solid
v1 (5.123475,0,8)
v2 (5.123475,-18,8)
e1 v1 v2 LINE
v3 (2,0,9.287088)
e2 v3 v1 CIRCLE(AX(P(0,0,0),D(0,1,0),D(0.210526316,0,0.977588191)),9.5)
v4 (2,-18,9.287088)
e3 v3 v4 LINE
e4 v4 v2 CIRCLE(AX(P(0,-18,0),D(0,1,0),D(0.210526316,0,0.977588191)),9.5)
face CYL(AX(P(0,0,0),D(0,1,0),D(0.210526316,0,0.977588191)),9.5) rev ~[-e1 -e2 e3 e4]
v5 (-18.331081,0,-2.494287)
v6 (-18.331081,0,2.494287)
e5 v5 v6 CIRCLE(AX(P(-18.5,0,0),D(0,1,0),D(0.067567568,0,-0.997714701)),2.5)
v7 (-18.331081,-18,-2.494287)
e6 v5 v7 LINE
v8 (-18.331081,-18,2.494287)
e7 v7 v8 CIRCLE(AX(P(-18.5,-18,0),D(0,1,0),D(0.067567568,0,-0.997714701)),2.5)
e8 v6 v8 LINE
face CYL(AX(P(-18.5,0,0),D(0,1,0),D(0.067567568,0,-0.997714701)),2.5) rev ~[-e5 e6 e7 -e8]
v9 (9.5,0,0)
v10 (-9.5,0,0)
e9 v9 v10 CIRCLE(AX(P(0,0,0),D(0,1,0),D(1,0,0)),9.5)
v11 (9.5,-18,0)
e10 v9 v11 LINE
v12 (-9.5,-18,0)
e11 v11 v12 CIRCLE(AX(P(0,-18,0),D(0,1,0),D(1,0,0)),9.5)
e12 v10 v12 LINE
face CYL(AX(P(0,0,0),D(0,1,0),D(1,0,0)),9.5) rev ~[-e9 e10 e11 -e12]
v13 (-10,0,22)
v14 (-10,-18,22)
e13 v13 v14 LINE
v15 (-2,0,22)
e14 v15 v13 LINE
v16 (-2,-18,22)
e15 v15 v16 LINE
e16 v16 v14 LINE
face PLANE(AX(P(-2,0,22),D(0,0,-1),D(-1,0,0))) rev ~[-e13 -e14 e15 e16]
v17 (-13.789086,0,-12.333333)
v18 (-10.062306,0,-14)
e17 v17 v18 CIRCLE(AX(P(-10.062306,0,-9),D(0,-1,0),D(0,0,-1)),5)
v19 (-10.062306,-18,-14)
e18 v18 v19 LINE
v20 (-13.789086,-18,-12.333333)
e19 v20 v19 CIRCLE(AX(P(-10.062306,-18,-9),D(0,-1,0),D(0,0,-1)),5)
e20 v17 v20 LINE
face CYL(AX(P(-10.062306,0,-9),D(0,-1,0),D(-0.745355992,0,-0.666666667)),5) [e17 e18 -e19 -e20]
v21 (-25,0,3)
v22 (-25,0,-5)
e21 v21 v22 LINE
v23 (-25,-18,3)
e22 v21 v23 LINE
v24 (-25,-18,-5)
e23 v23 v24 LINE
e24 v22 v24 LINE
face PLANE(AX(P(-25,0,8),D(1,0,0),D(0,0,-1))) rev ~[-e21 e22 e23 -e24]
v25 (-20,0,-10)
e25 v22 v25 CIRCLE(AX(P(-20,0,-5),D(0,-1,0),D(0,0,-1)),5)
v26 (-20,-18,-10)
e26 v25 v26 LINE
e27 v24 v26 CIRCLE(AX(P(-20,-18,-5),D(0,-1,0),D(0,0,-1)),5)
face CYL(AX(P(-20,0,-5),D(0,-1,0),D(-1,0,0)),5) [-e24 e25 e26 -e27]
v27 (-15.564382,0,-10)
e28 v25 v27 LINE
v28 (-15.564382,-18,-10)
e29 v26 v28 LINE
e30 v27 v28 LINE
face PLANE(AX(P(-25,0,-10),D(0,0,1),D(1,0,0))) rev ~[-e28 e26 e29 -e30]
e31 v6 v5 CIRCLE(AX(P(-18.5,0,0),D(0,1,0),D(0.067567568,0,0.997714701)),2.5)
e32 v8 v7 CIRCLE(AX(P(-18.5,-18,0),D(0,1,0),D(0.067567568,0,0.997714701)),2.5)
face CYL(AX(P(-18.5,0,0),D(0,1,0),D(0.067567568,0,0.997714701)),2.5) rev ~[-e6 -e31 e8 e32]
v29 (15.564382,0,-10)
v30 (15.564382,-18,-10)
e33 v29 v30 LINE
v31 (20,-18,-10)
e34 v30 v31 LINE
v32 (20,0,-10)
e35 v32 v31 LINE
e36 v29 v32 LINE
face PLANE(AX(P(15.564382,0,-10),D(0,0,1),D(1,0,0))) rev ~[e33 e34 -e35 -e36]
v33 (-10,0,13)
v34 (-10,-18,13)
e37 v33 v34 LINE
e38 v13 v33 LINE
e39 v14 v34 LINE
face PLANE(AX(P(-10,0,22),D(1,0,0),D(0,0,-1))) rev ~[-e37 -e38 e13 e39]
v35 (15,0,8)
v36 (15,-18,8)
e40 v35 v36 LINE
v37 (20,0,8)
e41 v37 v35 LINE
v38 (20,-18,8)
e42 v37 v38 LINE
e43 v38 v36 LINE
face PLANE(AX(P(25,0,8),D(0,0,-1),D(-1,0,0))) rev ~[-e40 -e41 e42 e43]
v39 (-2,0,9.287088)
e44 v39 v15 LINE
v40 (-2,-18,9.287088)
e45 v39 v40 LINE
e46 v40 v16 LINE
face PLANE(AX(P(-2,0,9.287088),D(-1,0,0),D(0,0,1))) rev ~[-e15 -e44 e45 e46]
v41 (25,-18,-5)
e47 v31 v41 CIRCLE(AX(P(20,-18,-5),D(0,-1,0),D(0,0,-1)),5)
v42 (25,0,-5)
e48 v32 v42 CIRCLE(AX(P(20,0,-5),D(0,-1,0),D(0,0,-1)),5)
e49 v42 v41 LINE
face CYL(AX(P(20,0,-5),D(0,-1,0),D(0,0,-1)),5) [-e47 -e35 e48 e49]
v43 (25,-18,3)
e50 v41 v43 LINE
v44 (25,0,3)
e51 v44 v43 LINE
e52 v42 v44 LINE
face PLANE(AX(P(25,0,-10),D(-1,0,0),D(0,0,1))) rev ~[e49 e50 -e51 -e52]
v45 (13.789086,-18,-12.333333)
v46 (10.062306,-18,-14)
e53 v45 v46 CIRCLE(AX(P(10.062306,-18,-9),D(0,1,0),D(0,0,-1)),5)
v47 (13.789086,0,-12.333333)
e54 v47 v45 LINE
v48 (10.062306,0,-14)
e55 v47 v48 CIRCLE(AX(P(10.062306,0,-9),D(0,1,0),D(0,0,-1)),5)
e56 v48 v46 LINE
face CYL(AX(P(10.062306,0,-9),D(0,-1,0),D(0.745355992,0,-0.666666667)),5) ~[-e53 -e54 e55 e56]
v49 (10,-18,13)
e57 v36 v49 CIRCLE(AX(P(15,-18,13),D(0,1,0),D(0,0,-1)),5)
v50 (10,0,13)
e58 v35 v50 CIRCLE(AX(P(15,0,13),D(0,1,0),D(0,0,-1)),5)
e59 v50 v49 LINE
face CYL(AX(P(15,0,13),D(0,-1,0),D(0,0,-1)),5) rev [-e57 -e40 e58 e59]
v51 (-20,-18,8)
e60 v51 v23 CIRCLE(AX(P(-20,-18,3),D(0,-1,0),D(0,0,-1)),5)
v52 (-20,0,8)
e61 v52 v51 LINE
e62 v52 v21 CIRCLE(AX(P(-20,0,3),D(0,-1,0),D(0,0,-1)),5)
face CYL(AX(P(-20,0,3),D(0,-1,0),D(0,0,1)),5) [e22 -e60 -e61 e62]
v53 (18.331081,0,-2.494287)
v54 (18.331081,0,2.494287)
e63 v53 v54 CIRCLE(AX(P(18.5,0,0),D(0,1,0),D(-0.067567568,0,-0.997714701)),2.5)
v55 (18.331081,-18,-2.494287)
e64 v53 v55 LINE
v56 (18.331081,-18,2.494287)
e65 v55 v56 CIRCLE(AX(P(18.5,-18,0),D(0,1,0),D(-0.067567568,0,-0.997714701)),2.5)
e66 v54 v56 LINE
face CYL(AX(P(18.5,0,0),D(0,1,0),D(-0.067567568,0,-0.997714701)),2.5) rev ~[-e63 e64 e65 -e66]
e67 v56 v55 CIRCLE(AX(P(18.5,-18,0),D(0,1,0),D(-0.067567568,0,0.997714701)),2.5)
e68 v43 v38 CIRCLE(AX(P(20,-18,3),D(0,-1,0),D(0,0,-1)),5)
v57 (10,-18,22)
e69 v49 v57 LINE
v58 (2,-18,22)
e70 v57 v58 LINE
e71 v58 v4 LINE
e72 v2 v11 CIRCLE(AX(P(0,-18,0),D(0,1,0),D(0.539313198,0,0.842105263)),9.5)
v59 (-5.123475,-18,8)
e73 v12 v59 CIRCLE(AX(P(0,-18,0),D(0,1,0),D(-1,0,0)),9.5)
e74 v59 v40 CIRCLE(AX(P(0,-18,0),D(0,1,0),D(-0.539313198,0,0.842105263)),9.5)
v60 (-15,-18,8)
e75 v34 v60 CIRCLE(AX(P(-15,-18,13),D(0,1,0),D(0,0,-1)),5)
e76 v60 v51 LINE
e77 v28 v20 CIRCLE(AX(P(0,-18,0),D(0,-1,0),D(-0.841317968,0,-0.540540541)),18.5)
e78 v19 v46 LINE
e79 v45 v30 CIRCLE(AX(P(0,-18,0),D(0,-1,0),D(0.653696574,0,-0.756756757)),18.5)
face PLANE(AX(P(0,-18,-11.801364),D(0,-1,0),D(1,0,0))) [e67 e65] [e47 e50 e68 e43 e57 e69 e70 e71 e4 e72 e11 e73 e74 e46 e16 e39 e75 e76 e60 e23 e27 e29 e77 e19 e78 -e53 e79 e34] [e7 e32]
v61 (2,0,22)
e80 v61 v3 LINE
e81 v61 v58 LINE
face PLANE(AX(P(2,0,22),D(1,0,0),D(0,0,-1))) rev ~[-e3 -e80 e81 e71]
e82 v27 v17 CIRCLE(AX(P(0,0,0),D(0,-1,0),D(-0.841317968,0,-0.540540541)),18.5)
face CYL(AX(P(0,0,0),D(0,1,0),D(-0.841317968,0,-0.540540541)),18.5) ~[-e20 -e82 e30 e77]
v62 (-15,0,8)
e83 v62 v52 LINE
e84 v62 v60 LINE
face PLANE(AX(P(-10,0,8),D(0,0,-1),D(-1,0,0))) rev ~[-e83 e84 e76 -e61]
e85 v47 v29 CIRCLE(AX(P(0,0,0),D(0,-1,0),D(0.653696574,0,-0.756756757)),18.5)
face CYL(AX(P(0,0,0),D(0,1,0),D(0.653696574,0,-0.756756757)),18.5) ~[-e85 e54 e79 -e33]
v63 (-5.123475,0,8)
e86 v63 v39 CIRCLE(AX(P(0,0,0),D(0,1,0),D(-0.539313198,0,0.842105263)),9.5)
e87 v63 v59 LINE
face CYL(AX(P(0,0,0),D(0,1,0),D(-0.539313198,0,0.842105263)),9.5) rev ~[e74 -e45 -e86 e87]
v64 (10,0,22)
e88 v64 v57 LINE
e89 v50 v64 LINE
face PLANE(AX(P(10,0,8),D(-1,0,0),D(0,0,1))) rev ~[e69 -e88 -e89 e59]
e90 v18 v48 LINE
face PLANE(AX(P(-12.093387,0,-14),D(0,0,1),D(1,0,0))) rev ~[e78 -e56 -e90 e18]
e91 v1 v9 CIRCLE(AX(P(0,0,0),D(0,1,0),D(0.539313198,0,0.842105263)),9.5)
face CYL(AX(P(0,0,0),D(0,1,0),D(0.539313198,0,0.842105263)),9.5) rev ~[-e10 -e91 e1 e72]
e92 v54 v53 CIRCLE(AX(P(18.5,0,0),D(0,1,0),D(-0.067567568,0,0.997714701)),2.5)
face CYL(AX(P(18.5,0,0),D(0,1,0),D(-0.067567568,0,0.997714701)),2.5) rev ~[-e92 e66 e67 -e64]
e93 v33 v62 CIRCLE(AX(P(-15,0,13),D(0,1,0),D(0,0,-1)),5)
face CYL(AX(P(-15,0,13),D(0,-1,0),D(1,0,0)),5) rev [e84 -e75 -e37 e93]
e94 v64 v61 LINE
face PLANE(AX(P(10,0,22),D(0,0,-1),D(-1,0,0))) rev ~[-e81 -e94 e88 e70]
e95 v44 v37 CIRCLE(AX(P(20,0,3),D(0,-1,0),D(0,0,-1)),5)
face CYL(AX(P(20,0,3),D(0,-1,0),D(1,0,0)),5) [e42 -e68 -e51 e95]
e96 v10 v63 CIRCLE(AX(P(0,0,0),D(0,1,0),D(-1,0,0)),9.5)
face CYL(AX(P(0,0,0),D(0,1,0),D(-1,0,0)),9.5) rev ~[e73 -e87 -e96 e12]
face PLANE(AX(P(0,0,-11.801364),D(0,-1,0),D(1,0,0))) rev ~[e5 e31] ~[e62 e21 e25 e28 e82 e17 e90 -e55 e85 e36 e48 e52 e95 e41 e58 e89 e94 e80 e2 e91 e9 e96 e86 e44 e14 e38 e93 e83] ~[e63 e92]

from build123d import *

# Parameters (mm, degrees)
F1_DEPTH = 18
F2_R     = 5


with BuildPart() as f1:
    # F0 (on Front) → F1 (new body)
    with BuildSketch(Plane.XZ):
        with BuildLine():
            ThreePointArc((12.0933866224, -14), (13.9727608958, -12.1248485743), (15.5643824163, -10))
            Line((15.5643824163, -10), (-15.5643824163, -10))
            ThreePointArc((-15.5643824163, -10), (-13.9727608958, -12.1248485743), (-12.0933866224, -14))
            Line((-12.0933866224, -14), (12.0933866224, -14))
        make_face()
        with BuildLine():
            Line((25, 8), (16.6808273176, 8))
            ThreePointArc((16.6808273176, 8), (17.7210793132, 5.311623855), (18.3310810811, 2.4942867515))
            ThreePointArc((18.3310810811, 2.4942867515), (20.2070006887, 1.8265127015), (21, 0))
            ThreePointArc((21, 0), (20.2070006887, -1.8265127015), (18.3310810811, -2.4942867515))
            ThreePointArc((18.3310810811, -2.4942867515), (17.358270198, -6.3984729219), (15.5643824163, -10))
            Line((15.5643824163, -10), (25, -10))
            Line((25, -10), (25, 8))
        make_face()
        with BuildLine():
            Line((2, 22), (2, 18.3915741577))
            ThreePointArc((2, 18.3915741577), (6.1642723241, 17.4428136123), (10, 15.5643824163))
            Line((10, 15.5643824163), (10, 22))
            Line((10, 22), (2, 22))
        make_face()
        with BuildLine():
            ThreePointArc((-10, 15.5643824163), (-6.1642723241, 17.4428136123), (-2, 18.3915741577))
            Line((-2, 18.3915741577), (-2, 22))
            Line((-2, 22), (-10, 22))
            Line((-10, 22), (-10, 15.5643824163))
        make_face()
        with BuildLine():
            ThreePointArc((-18.3310810811, 2.4942867515), (-17.7210793132, 5.311623855), (-16.6808273176, 8))
            Line((-16.6808273176, 8), (-25, 8))
            Line((-25, 8), (-25, -10))
            Line((-25, -10), (-15.5643824163, -10))
            ThreePointArc((-15.5643824163, -10), (-17.358270198, -6.3984729219), (-18.3310810811, -2.4942867515))
            ThreePointArc((-18.3310810811, -2.4942867515), (-21, 0), (-18.3310810811, 2.4942867515))
        make_face()
        with BuildLine():
            ThreePointArc((2, 9.2870878105), (3.6194093636, 8.7835002054), (5.123475383, 8))
            Line((5.123475383, 8), (10, 8))
            Line((10, 8), (10, 15.5643824163))
            ThreePointArc((10, 15.5643824163), (6.1642723241, 17.4428136123), (2, 18.3915741577))
            Line((2, 18.3915741577), (2, 9.2870878105))
        make_face()
        with BuildLine():
            Line((-10, 8), (-5.123475383, 8))
            ThreePointArc((-5.123475383, 8), (-3.6194093636, 8.7835002054), (-2, 9.2870878105))
            Line((-2, 9.2870878105), (-2, 18.3915741577))
            ThreePointArc((-2, 18.3915741577), (-6.1642723241, 17.4428136123), (-10, 15.5643824163))
            Line((-10, 15.5643824163), (-10, 8))
        make_face()
        with BuildLine():
            Line((10, 0), (9.5, 0))
            ThreePointArc((9.5, 0), (0, -9.5), (-9.5, 0))
            Line((-9.5, 0), (-10, 0))
            Line((-10, 0), (-10, 8))
            Line((-10, 8), (-16.6808273176, 8))
            ThreePointArc((-16.6808273176, 8), (-17.7210793132, 5.311623855), (-18.3310810811, 2.4942867515))
            ThreePointArc((-18.3310810811, 2.4942867515), (-16.6734872985, 1.7070006887), (-16, 0))
            ThreePointArc((-16, 0), (-16.6734872985, -1.7070006887), (-18.3310810811, -2.4942867515))
            ThreePointArc((-18.3310810811, -2.4942867515), (-17.358270198, -6.3984729219), (-15.5643824163, -10))
            Line((-15.5643824163, -10), (15.5643824163, -10))
            ThreePointArc((15.5643824163, -10), (17.358270198, -6.3984729219), (18.3310810811, -2.4942867515))
            ThreePointArc((18.3310810811, -2.4942867515), (16, 0), (18.3310810811, 2.4942867515))
            ThreePointArc((18.3310810811, 2.4942867515), (17.7210793132, 5.311623855), (16.6808273176, 8))
            Line((16.6808273176, 8), (10, 8))
            Line((10, 8), (10, 0))
        make_face()
        with BuildLine():
            Line((-10, 0), (-9.5, 0))
            ThreePointArc((-9.5, 0), (-8.3343570879, 4.5594398703), (-5.123475383, 8))
            Line((-5.123475383, 8), (-10, 8))
            Line((-10, 8), (-10, 0))
        make_face()
        with BuildLine():
            ThreePointArc((5.123475383, 8), (8.3343570879, 4.5594398703), (9.5, 0))
            Line((9.5, 0), (10, 0))
            Line((10, 0), (10, 8))
            Line((10, 8), (5.123475383, 8))
        make_face()
    extrude(amount=F1_DEPTH)

    # F2
    f2_edges = [f1.edges().sort_by_distance(p)[0] for p in [
        (-25, -9, 8),
        (-25, -9, -10),
        (25, -9, -10),
        (25, -9, 8),
        (10, -9, 8),
        (-10, -9, 8),
        (-12.093387, -9, -14),
        (12.093387, -9, -14),
    ]]
    fillet(f2_edges, radius=F2_R)


solid = f1.part
